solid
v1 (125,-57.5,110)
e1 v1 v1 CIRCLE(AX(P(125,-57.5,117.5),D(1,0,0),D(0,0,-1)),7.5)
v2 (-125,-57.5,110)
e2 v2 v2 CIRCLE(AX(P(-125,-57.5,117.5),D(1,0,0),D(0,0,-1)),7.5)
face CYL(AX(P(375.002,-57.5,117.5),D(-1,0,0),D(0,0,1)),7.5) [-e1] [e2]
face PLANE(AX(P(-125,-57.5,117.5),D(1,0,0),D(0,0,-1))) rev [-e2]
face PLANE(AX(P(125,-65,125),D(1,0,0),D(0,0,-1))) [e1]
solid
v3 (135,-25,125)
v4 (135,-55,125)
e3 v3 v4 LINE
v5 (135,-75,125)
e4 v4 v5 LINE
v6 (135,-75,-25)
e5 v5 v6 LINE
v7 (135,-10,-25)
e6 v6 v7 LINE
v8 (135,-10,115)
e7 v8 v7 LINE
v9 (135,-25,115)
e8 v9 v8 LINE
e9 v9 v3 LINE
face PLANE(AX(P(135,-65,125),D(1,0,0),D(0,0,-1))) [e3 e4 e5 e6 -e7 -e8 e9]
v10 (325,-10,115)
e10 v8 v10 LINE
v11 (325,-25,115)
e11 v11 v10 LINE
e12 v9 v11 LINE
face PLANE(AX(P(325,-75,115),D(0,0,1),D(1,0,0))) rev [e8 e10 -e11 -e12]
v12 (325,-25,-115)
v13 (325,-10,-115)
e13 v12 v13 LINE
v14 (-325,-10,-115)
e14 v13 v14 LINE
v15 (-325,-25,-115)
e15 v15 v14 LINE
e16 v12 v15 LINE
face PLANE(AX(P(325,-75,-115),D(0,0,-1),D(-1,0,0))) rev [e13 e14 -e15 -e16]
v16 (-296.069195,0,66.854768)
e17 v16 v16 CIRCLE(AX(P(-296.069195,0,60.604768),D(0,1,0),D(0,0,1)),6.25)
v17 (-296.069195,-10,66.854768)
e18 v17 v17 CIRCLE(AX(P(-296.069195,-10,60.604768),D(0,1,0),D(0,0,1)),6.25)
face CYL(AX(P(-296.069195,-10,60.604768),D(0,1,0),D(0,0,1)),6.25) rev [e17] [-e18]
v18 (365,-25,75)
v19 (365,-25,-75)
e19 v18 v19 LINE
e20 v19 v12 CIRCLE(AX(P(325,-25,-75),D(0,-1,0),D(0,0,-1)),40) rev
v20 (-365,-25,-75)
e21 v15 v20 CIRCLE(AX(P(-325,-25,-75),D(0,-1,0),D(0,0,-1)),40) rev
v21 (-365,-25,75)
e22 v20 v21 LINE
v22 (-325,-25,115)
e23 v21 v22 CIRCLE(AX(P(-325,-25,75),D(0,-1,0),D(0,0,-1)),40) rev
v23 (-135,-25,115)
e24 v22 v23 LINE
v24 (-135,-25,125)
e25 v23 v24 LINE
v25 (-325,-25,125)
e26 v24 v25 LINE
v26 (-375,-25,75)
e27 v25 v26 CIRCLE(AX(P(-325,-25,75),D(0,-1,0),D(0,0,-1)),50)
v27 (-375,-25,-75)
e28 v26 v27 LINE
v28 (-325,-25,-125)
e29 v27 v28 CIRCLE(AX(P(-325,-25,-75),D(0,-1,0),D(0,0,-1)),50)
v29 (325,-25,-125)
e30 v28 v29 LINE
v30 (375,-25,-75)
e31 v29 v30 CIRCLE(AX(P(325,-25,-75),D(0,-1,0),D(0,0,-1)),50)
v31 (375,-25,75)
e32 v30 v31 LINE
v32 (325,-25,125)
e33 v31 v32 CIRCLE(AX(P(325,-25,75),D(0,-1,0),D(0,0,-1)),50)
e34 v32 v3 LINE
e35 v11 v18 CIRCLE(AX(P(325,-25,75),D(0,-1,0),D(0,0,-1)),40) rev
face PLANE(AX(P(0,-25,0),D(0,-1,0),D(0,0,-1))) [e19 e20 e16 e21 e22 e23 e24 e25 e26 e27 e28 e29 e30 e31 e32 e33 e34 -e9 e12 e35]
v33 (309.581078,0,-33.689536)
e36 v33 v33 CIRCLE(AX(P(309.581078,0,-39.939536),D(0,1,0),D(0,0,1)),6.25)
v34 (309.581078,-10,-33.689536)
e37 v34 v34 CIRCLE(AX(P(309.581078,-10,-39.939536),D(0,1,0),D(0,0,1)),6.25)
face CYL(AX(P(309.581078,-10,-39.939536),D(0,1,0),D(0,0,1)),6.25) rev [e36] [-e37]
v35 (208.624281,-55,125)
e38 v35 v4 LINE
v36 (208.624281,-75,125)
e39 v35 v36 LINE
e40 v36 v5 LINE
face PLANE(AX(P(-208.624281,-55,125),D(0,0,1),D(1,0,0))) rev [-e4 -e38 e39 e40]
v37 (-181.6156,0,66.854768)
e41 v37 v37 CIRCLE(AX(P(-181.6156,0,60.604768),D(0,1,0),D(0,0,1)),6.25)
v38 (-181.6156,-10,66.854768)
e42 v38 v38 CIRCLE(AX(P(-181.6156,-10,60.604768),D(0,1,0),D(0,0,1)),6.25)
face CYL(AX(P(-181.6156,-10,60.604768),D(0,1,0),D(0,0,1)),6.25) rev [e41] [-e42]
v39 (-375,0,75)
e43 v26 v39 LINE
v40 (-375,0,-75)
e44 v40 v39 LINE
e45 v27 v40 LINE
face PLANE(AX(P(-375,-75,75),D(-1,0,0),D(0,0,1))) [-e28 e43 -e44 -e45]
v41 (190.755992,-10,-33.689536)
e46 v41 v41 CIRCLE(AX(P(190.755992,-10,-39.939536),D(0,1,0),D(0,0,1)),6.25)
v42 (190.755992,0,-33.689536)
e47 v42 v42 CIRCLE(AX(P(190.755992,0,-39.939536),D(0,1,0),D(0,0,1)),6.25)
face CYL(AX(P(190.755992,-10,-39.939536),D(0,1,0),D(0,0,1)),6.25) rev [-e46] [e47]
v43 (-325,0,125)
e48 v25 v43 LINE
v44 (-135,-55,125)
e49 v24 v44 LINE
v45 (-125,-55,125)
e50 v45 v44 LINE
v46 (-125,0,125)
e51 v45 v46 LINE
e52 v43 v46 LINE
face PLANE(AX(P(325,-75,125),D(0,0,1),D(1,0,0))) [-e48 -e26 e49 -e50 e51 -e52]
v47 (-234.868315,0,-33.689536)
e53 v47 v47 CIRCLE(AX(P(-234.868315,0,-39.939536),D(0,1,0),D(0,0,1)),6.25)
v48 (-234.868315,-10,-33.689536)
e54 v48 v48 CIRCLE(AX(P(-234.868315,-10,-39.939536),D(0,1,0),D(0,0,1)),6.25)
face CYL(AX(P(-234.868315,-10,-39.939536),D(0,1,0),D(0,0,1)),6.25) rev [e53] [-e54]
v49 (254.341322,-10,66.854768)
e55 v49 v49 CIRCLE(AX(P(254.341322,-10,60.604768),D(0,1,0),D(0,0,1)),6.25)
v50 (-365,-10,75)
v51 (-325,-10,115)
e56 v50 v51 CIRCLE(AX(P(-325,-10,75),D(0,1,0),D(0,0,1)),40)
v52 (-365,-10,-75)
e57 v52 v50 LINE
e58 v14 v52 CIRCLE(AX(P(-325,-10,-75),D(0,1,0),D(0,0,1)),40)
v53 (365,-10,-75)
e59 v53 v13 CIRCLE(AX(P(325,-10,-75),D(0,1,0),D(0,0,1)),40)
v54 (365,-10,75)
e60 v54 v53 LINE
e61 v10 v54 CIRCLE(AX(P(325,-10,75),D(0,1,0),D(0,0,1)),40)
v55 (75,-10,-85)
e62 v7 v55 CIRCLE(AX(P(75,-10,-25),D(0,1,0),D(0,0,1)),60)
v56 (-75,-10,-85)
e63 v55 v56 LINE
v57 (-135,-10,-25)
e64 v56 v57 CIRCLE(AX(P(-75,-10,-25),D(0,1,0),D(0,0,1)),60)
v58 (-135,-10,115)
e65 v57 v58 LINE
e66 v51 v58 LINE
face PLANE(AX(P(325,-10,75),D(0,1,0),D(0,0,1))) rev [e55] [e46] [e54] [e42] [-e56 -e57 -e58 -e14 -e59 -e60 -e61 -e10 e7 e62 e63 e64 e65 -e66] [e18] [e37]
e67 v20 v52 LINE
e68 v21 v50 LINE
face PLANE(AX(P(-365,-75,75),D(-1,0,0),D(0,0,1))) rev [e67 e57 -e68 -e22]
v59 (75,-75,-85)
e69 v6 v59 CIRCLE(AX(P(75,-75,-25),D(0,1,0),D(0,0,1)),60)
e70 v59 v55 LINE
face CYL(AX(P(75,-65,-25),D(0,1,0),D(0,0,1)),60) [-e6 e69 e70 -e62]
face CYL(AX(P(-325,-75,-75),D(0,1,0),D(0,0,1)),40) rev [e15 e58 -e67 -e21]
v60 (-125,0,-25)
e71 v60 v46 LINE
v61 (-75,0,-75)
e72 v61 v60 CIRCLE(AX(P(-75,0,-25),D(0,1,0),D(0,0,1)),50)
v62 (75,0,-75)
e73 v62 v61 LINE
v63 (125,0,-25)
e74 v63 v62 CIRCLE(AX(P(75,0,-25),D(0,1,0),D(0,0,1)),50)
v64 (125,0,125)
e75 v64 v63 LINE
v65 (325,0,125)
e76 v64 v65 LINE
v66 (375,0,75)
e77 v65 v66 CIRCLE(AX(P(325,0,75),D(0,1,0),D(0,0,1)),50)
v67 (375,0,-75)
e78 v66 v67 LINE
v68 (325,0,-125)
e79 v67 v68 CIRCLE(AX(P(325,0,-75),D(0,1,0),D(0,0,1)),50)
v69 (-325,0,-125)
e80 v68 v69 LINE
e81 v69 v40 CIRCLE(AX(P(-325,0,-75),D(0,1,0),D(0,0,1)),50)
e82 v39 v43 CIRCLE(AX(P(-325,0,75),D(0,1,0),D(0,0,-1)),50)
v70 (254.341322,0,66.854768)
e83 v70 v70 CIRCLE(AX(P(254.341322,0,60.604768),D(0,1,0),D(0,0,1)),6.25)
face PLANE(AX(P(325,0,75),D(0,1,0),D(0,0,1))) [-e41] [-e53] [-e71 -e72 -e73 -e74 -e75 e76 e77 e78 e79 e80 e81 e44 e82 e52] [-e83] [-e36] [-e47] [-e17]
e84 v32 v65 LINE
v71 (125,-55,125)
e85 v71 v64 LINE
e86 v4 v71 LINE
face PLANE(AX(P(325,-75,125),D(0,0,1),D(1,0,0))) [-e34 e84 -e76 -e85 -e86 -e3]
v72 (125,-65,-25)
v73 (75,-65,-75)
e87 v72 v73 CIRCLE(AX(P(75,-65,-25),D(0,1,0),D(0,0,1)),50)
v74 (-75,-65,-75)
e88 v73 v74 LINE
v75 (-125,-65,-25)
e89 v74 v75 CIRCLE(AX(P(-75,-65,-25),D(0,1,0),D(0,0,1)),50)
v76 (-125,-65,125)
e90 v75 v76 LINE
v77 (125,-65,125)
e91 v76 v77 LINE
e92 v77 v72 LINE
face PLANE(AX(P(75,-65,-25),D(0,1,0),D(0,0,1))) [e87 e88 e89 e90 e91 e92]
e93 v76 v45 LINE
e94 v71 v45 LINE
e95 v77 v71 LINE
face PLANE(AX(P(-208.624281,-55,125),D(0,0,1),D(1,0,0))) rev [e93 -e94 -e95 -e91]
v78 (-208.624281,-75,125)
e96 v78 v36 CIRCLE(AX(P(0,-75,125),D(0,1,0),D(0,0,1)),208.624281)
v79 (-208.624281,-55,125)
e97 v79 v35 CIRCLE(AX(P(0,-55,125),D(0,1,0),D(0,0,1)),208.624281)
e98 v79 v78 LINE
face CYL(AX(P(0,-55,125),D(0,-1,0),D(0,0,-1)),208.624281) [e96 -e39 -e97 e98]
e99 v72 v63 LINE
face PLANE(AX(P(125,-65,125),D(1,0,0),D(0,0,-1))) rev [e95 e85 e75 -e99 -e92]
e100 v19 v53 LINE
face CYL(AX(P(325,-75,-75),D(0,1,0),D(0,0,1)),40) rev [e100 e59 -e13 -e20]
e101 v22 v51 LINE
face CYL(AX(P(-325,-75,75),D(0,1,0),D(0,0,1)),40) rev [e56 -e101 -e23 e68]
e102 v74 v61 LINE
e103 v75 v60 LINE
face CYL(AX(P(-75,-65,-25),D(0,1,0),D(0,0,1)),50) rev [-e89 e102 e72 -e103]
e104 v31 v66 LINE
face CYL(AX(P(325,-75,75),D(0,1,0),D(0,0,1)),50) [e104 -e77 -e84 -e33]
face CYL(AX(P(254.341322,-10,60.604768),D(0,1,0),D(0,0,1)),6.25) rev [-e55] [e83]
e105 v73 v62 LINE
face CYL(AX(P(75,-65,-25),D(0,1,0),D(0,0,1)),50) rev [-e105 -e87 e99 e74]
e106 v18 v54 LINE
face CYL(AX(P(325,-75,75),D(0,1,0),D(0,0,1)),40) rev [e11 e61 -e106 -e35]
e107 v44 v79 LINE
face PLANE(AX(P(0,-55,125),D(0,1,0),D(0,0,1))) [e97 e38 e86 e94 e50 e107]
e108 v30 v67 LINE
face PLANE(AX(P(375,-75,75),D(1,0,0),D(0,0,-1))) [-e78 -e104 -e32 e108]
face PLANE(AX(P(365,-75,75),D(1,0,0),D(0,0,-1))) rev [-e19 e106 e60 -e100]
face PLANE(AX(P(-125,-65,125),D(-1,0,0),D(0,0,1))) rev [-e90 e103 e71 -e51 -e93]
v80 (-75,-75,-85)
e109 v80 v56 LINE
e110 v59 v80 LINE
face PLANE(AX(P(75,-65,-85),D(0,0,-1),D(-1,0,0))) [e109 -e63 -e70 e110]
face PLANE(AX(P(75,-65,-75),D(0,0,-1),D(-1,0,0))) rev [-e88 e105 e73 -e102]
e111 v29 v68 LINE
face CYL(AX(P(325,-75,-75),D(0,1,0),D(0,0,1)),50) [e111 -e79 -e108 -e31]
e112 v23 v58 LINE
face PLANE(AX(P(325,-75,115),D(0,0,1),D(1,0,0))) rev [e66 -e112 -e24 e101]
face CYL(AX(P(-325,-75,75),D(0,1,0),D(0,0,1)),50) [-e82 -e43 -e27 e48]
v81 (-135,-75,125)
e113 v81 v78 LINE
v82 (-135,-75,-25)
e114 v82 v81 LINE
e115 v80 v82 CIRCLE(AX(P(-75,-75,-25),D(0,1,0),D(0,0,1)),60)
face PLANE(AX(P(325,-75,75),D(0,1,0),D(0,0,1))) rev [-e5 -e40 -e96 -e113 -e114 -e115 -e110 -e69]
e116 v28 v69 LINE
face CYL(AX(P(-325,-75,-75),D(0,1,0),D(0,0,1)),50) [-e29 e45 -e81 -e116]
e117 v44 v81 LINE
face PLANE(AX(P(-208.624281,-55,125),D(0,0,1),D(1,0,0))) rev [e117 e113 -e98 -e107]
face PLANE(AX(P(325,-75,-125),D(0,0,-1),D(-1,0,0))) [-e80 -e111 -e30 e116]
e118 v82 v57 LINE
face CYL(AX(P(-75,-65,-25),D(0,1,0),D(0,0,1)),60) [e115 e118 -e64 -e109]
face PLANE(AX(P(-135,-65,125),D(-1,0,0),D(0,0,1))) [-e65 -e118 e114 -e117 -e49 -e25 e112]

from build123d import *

# Parameters (mm, degrees)
BOSS_EXTRUDE1_DEPTH      = 75
CUT_EXTRUDE1_DEPTH       = 65
SHELL1_START             = -75
SHELL1_DEPTH             = 65
CUT_EXTRUDE3_DEPTH       = 50
SKETCH6_R                = 6.25
CUT_EXTRUDE4_DEPTH       = 10
BOSS_EXTRUDE2_DEPTH      = 10
BOSS_EXTRUDE2_DEPTH_BACK = 10
BOSS_EXTRUDE5_REACH      = 607.748
SKETCH10_R               = 7.5


# Read off the part's stored shape, not the designer's step: Shell1
with BuildPart() as part:
    # Sketch1 → Boss-Extrude1 (new body)
    with BuildSketch(Plane(origin=(0, 0, 0), x_dir=(1, 0, 0), z_dir=(0, 1, 0))):
        with BuildLine():
            Line((325, -125), (-325, -125))
            ThreePointArc((-325, -125), (-360.355339059, -110.355339059), (-375, -75))
            Line((-375, -75), (-375, 75))
            ThreePointArc((-375, 75), (-360.355339059, 110.355339059), (-325, 125))
            Line((-325, 125), (325, 125))
            ThreePointArc((325, 125), (360.355339059, 110.355339059), (375, 75))
            Line((375, 75), (375, -75))
            ThreePointArc((375, -75), (360.355339059, -110.355339059), (325, -125))
        make_face()
    extrude(amount=-BOSS_EXTRUDE1_DEPTH)

    # Sketch2 → Cut-Extrude1 (cut)
    with BuildSketch(Plane(origin=(0, 0, 0), x_dir=(1, 0, 0), z_dir=(0, 1, 0))):
        with BuildLine():
            Line((125, -125), (-125, -125))
            Line((-125, -125), (-125, 25))
            ThreePointArc((-125, 25), (-110.355339059, 60.355339059), (-75, 75))
            Line((-75, 75), (75, 75))
            ThreePointArc((75, 75), (110.355339059, 60.355339059), (125, 25))
            Line((125, 25), (125, -125))
        make_face()
    extrude(amount=-CUT_EXTRUDE1_DEPTH, mode=Mode.SUBTRACT)

    # Shell1 outline → Shell1 (cut)
    with BuildSketch(Plane(origin=(0, 0, 0), x_dir=(1, 0, 0), z_dir=(0, 1, 0)).offset(SHELL1_START)):
        with BuildLine():
            ThreePointArc((-365, -75), (-353.284271247, -103.284271247), (-325, -115))
            Line((-325, -115), (-135, -115))
            Line((-135, -115), (-135, 25))
            ThreePointArc((-135, 25), (-117.426406871, 67.426406871), (-75, 85))
            Line((-75, 85), (75, 85))
            ThreePointArc((75, 85), (117.426406871, 67.426406871), (135, 25))
            Line((135, 25), (135, -115))
            Line((135, -115), (325, -115))
            ThreePointArc((325, -115), (353.284271247, -103.284271247), (365, -75))
            Line((365, -75), (365, 75))
            ThreePointArc((365, 75), (353.284271247, 103.284271247), (325, 115))
            Line((325, 115), (-325, 115))
            ThreePointArc((-325, 115), (-353.284271247, 103.284271247), (-365, 75))
            Line((-365, 75), (-365, -75))
        make_face()
    extrude(amount=SHELL1_DEPTH, mode=Mode.SUBTRACT)

    # Sketch5 → Cut-Extrude3 (cut)
    with BuildSketch(Plane.XZ.offset(75)):
        with BuildLine():
            ThreePointArc((375, 75), (360.355339059, 110.355339059), (325, 125))
            Line((325, 125), (135, 125))
            Line((135, 125), (135, 115))
            Line((135, 115), (325, 115))
            ThreePointArc((325, 115), (353.284271247, 103.284271247), (365, 75))
            Line((365, 75), (365, -75))
            ThreePointArc((365, -75), (353.284271247, -103.284271247), (325, -115))
            Line((325, -115), (-325, -115))
            ThreePointArc((-325, -115), (-353.284271247, -103.284271247), (-365, -75))
            Line((-365, -75), (-365, 75))
            ThreePointArc((-365, 75), (-353.284271247, 103.284271247), (-325, 115))
            Line((-325, 115), (-135, 115))
            Line((-135, 115), (-135, 125))
            Line((-135, 125), (-325, 125))
            ThreePointArc((-325, 125), (-360.355339059, 110.355339059), (-375, 75))
            Line((-375, 75), (-375, -75))
            ThreePointArc((-375, -75), (-360.355339059, -110.355339059), (-325, -125))
            Line((-325, -125), (325, -125))
            ThreePointArc((325, -125), (360.355339059, -110.355339059), (375, -75))
            Line((375, -75), (375, 75))
        make_face()
    extrude(amount=-CUT_EXTRUDE3_DEPTH, mode=Mode.SUBTRACT)

    # Sketch6 → Cut-Extrude4 (cut)
    with BuildSketch(Plane(origin=(0, 0, 0), x_dir=(1, 0, 0), z_dir=(0, 1, 0))):
        with Locations(Location((-181.615600277, -60.604768145, 0), (0, 0, 270))):
            Circle(SKETCH6_R)
        with Locations(Location((-296.0691952, -60.604768145, 0), (0, 0, 270))):
            Circle(SKETCH6_R)
        with Locations(Location((-234.868314581, 39.939535728, 0), (0, 0, 270))):
            Circle(SKETCH6_R)
        with Locations(Location((190.755991538, 39.939535728, 0), (0, 0, 270))):
            Circle(SKETCH6_R)
        with Locations(Location((309.581077934, 39.939535728, 0), (0, 0, 270))):
            Circle(SKETCH6_R)
        with Locations(Location((254.341322051, -60.604768145, 0), (0, 0, 270))):
            Circle(SKETCH6_R)
    extrude(amount=-CUT_EXTRUDE4_DEPTH, mode=Mode.SUBTRACT)

    # Sketch7 → Boss-Extrude2 (add, two sides: drawn at the far end of the back side and taken through both)
    with BuildSketch(Plane(origin=(0, -65, 0), x_dir=(1, 0, 0), z_dir=(0, 1, 0)).offset(-BOSS_EXTRUDE2_DEPTH_BACK)):
        with BuildLine():
            Line((-208.624281034, -125), (208.624281034, -125))
            ThreePointArc((208.624281034, -125), (0, -333.624281034), (-208.624281034, -125))
        make_face()
    extrude(amount=BOSS_EXTRUDE2_DEPTH + BOSS_EXTRUDE2_DEPTH_BACK)


with BuildPart() as body_2:

    # Sketch10 → Boss-Extrude5 (new, up to next)
    with BuildSketch(Plane(origin=(-125, 0, 0), x_dir=(0, 0, -1), z_dir=(1, 0, 0)), mode=Mode.PRIVATE) as boss_extrude5_sk1:
        with Locations((-117.5, -57.5)):
            Circle(SKETCH10_R)
    boss_extrude5_tool1 = extrude(boss_extrude5_sk1.sketch, amount=BOSS_EXTRUDE5_REACH, mode=Mode.PRIVATE) - part.part
    add(boss_extrude5_tool1.solids().sort_by_distance((-125, -57.5, 117.5))[0])


solid = Compound([part.part, body_2.part])
